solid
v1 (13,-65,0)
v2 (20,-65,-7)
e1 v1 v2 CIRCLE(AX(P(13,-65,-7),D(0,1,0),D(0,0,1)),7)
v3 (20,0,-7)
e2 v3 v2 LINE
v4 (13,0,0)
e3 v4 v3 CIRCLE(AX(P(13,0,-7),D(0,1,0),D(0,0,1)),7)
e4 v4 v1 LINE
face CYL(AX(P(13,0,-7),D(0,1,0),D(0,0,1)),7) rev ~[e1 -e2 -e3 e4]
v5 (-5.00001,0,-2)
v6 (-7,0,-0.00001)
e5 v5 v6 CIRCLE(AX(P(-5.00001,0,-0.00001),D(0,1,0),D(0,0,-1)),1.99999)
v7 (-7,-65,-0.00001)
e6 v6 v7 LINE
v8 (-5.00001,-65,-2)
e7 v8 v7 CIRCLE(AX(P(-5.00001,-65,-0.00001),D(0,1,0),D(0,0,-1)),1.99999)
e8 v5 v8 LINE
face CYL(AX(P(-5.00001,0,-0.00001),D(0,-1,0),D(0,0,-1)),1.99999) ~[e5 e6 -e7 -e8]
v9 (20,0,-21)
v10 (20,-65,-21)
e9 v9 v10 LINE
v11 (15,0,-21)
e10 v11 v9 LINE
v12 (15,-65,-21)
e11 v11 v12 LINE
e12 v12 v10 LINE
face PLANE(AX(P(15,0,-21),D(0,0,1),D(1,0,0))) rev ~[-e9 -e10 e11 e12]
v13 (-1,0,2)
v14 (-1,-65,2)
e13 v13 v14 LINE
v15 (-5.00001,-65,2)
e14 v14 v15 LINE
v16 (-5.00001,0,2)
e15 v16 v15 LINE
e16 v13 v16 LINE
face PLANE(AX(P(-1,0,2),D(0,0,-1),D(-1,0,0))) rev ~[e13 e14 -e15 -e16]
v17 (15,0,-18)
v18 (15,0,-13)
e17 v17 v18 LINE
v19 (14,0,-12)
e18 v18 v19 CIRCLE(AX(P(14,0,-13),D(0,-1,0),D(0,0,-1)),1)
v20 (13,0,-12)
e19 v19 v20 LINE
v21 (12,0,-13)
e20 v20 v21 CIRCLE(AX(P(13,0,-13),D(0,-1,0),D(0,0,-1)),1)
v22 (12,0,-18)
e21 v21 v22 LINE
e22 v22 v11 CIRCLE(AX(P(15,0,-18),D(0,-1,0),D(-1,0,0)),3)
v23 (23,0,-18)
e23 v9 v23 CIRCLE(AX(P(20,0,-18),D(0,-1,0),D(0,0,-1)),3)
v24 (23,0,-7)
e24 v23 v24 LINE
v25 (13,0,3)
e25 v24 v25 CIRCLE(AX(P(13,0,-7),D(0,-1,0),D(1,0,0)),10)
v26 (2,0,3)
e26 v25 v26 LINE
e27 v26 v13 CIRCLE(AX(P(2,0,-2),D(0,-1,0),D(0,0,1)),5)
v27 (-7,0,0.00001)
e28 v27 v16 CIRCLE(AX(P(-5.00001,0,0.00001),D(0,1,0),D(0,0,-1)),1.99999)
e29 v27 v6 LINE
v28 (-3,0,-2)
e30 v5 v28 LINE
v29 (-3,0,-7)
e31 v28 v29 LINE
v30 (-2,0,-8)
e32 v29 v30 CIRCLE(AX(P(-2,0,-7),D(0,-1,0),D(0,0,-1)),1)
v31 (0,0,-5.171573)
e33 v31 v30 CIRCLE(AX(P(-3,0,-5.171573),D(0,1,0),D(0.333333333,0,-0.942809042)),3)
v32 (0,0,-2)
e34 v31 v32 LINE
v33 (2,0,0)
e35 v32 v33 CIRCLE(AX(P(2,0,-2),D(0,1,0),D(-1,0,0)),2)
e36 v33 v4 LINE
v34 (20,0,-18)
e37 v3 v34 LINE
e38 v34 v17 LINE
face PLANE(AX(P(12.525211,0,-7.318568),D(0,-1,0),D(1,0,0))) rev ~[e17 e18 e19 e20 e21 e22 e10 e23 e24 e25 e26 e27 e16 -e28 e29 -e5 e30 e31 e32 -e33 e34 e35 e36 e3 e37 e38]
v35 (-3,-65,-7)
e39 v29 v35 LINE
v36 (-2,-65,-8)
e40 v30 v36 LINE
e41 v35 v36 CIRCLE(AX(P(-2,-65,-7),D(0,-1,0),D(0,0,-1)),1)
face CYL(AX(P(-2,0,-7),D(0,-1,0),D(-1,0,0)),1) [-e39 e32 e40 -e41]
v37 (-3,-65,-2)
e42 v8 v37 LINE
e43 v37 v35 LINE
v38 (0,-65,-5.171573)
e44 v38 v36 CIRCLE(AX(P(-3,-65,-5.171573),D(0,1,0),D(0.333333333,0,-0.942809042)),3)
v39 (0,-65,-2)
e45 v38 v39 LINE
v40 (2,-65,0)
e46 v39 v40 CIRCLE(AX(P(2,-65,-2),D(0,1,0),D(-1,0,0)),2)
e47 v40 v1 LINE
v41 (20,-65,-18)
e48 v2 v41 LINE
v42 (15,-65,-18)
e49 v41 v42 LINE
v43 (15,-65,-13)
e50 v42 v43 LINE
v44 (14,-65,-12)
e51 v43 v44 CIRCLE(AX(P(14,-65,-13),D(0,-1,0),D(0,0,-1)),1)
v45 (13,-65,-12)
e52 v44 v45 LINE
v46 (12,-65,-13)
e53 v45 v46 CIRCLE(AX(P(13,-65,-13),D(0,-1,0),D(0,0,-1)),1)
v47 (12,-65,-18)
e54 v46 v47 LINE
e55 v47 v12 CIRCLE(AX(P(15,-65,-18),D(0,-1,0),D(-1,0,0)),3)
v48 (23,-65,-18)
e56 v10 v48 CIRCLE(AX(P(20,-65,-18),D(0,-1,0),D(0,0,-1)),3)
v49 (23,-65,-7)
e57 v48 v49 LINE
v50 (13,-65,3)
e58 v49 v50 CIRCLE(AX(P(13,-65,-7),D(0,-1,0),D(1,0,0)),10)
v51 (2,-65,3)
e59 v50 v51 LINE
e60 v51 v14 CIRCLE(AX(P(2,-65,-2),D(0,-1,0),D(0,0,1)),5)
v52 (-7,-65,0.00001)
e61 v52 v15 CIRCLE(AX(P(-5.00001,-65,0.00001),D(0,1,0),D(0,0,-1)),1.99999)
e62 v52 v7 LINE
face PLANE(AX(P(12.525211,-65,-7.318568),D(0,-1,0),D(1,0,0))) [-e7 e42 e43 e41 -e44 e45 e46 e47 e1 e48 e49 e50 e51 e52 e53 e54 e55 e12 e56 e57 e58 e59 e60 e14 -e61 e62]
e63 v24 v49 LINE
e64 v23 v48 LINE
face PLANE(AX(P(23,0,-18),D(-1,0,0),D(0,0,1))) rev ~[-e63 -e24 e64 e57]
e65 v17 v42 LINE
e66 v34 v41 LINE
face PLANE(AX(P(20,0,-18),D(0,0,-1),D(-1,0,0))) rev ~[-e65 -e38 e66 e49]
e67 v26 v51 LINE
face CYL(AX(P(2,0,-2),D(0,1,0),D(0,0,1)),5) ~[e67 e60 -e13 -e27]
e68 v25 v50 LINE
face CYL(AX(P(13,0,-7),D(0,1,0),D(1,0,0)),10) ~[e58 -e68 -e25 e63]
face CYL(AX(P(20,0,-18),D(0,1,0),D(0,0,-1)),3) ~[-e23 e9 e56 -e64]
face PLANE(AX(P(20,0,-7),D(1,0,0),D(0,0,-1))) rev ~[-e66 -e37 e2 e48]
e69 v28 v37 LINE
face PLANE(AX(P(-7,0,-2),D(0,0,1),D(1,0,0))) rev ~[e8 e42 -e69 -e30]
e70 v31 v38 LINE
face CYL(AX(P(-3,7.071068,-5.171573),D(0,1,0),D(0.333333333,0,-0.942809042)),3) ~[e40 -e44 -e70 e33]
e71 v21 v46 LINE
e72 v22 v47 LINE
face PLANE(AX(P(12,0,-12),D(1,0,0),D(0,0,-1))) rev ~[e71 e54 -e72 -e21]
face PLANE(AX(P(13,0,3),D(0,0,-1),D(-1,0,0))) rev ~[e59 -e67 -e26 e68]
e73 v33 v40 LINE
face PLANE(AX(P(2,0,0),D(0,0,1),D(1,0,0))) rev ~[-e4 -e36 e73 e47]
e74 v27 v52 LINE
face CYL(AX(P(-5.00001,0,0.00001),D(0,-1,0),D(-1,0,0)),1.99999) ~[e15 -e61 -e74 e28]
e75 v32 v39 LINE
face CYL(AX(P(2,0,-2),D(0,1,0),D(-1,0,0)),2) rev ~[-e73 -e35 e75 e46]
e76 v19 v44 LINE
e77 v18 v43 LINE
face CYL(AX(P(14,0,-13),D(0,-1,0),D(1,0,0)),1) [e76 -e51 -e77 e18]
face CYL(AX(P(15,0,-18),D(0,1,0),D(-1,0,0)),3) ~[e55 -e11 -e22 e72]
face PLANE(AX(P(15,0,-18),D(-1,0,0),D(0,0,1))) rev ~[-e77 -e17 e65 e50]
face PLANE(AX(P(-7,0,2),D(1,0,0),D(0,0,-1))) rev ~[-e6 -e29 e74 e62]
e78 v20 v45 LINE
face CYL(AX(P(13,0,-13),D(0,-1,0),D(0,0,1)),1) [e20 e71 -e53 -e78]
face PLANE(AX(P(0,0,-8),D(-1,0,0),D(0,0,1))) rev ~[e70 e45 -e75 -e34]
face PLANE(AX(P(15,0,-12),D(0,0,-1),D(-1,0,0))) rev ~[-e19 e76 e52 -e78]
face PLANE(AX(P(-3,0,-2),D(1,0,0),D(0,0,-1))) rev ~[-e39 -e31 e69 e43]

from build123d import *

# Parameters (mm, degrees)
F1_DEPTH    = 65
F2_R        = 1
F3_R        = 1.99999
F4_T1_DEPTH = 79.1421356237


# Not quite as in the source:
# - a fillet or chamfer that OpenCascade refuses, or shapes differently, is made with other operations: its cross-section is extruded or revolved along the edge and cut away or added
# - a fillet or chamfer is up to 0.001 mm smaller than in the source, because OpenCascade refuses the exact size
# - a feature names something its author has since deleted; it is built from what else it names


with BuildPart() as f1:
    # F0 (on Front) → F1 (new body)
    with BuildSketch(Plane.XZ):
        with BuildLine():
            ThreePointArc((0, -2), (0.5857864376, -0.5857864376), (2, 0))
            Line((2, 0), (13, 0))
            ThreePointArc((13, 0), (17.9497474683, -2.0502525317), (20, -7))
            Line((20, -7), (20, -18))
            Line((20, -18), (15, -18))
            Line((15, -18), (15, -12))
            Line((15, -12), (12, -12))
            Line((12, -12), (12, -18))
            ThreePointArc((12, -18), (12.8786796564, -20.1213203436), (15, -21))
            Line((15, -21), (20, -21))
            ThreePointArc((20, -21), (22.1213203436, -20.1213203436), (23, -18))
            Line((23, -18), (23, -7))
            ThreePointArc((23, -7), (20.0710678119, 0.0710678119), (13, 3))
            Line((13, 3), (2, 3))
            ThreePointArc((2, 3), (0.4188611699, 2.7434164903), (-1, 2))
            ThreePointArc((-1, 2), (-2.472135955, 0.2360679775), (-3, -2))
            Line((-3, -2), (-3, -8))
            Line((-3, -8), (0, -8))
            Line((0, -8), (0, -2))
        make_face()
        with BuildLine():
            Line((-7, -2), (-3, -2))
            ThreePointArc((-3, -2), (-2.472135955, 0.2360679775), (-1, 2))
            Line((-1, 2), (-7, 2))
            Line((-7, 2), (-7, -2))
        make_face()
    extrude(amount=F1_DEPTH)

    # F2
    f2_edges = [f1.edges().sort_by_distance(p)[0] for p in [
        (-3, -32.5, -8),
        (12, -32.5, -12),
        (15, -32.5, -12),
    ]]
    fillet(f2_edges, radius=F2_R)

    # F3 (radius 2 in the source; OpenCascade refuses exactly that, so slightly less here)
    f3_edges = [f1.edges().sort_by_distance(p)[0] for p in [
        (-7, -32.5, -2),
        (-7, -32.5, 2),
    ]]
    fillet(f3_edges, radius=F3_R)

    # F4: fillet of radius 3 on 1 edges, made by hand

    # F4_s2 → F4_t1 (cut)
    with BuildSketch(Plane.XZ.offset(-7.0710678119)):
        with BuildLine():
            ThreePointArc((-2, -8), (-0.5505102572, -6.9036236828), (0, -5.1715728753))
            Line((0, -5.1715728753), (0.06, -5.1715728753))
            Line((0.06, -5.1715728753), (0.06, -8))
            Line((0.06, -8), (0, -8.06))
            ThreePointArc((0, -8.06), (-1, -8.06), (-1.98, -8.0565685425))
            Line((-1.98, -8.0565685425), (-2, -8))
        make_face()
    extrude(amount=F4_T1_DEPTH, mode=Mode.SUBTRACT)


solid = f1.part
